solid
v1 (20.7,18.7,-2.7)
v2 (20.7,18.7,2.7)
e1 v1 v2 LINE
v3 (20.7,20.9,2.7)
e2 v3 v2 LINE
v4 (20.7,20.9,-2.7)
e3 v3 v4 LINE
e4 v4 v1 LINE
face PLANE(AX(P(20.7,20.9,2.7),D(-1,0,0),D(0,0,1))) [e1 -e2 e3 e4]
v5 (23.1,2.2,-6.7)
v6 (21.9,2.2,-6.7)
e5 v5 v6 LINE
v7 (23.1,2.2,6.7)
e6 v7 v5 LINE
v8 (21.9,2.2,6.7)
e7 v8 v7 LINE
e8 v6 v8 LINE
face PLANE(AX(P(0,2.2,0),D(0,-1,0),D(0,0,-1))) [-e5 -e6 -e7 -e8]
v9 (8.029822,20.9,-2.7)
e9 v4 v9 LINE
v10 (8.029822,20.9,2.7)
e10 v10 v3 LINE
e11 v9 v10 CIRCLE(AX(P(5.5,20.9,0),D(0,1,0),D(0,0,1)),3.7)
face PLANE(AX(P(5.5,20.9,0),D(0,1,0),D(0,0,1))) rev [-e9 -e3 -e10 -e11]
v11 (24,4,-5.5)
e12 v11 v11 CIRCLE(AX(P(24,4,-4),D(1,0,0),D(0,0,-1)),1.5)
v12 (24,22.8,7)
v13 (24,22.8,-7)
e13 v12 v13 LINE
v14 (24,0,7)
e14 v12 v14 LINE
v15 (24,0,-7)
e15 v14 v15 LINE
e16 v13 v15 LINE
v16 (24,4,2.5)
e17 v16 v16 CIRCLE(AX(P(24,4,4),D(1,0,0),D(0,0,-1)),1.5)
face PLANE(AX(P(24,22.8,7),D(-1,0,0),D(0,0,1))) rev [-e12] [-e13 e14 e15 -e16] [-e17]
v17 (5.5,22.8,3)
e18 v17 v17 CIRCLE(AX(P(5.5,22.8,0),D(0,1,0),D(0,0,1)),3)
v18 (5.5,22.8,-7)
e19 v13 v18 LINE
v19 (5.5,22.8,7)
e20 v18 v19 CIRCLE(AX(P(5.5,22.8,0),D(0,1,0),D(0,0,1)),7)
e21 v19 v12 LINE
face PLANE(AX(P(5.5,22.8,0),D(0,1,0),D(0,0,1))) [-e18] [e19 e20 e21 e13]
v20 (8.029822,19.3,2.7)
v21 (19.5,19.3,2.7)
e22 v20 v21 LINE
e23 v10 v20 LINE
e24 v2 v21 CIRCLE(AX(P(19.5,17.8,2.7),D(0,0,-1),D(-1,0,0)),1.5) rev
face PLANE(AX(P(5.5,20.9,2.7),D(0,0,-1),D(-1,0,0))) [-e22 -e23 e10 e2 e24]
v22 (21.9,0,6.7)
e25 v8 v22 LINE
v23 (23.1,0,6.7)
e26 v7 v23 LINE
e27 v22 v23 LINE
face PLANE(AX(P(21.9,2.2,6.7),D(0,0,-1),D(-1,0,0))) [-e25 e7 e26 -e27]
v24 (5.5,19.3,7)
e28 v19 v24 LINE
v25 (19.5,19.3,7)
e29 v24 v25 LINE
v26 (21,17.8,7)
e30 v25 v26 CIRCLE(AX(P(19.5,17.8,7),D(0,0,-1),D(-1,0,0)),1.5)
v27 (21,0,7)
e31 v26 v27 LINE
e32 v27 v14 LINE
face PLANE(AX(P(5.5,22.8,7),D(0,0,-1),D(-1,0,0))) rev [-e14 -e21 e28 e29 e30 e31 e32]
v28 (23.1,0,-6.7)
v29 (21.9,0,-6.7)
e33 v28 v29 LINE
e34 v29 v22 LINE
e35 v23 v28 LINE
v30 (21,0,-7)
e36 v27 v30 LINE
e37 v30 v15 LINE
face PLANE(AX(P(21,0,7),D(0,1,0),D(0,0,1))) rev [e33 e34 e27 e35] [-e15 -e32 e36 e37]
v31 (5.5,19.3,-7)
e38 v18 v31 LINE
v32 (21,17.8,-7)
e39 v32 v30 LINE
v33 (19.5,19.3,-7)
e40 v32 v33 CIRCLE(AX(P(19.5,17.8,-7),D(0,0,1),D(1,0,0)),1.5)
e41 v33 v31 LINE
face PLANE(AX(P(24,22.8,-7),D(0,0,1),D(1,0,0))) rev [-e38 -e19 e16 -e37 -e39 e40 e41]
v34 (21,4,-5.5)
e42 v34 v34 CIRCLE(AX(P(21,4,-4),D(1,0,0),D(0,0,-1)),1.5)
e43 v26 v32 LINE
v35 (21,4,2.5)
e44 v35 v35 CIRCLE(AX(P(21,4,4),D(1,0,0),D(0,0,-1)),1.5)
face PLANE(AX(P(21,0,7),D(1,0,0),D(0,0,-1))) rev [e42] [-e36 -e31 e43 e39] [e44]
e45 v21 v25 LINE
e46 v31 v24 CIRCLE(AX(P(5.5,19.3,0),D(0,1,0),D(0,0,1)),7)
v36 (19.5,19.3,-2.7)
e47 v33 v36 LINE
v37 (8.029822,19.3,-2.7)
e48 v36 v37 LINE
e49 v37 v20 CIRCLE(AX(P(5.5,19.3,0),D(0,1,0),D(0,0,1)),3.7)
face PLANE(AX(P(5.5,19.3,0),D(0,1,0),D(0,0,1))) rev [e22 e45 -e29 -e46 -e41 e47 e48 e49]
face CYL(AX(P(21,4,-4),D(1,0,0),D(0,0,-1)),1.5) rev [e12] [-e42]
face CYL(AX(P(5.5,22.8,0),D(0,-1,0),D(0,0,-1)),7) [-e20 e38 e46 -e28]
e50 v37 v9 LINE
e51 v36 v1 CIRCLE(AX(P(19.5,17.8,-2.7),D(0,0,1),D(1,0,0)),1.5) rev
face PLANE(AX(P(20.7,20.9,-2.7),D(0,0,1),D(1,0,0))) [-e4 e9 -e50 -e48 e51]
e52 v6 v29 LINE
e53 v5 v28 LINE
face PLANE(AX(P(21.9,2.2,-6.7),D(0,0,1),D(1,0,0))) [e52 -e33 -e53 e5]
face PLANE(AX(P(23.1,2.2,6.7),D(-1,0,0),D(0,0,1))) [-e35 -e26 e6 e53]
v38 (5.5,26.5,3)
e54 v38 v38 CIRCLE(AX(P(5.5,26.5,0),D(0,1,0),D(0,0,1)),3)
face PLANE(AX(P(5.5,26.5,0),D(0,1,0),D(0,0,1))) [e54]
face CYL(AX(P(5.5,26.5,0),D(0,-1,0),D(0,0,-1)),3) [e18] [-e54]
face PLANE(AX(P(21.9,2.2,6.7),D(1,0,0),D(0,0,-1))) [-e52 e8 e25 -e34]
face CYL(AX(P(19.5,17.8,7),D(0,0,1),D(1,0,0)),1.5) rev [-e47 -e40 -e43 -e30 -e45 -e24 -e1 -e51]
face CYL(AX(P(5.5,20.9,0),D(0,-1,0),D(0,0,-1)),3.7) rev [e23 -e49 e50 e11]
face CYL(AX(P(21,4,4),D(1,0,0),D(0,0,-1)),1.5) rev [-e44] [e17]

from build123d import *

# Parameters (mm, degrees)
BOSS_EXTRUDE1_DEPTH = 3.5
SKETCH2_W           = 3
SKETCH2_H           = 22.8
BOSS_EXTRUDE2_DEPTH = 7
SKETCH3_R           = 3
BOSS_EXTRUDE3_DEPTH = 3.7
SKETCH4_R           = 3.7
CUT_EXTRUDE2_DEPTH  = 1.6
CUT_EXTRUDE4_DEPTH  = 1.6
SKETCH6_W           = 1.2
SKETCH6_H           = 13.4
CUT_EXTRUDE6_DEPTH  = 2.2
SKETCH7_R           = 1.5
CUT_EXTRUDE7_DEPTH  = 3
FILLET1_R           = 1.5


with BuildPart() as part:
    # Sketch1 → Boss-Extrude1 (new body)
    with BuildSketch(Plane(origin=(0, 19.3, 0), x_dir=(1, 0, 0), z_dir=(0, 1, 0))):
        with BuildLine():
            Line((5.5, -7), (24, -7))
            Line((24, -7), (24, 7))
            Line((24, 7), (5.5, 7))
            ThreePointArc((5.5, 7), (-1.5, 0), (5.5, -7))
        make_face()
    extrude(amount=BOSS_EXTRUDE1_DEPTH)

    # Sketch2 → Boss-Extrude2 (add, symmetric)
    with BuildSketch(Plane.XY):
        with Locations((22.5, 11.4)):
            Rectangle(SKETCH2_W, SKETCH2_H)
    extrude(amount=BOSS_EXTRUDE2_DEPTH, both=True)

    # Sketch3 → Boss-Extrude3 (add)
    with BuildSketch(Plane(origin=(0, 22.8, 0), x_dir=(1, 0, 0), z_dir=(0, 1, 0))):
        with Locations(Location((5.5, 0, 0), (0, 0, 270))):
            Circle(SKETCH3_R)
    extrude(amount=BOSS_EXTRUDE3_DEPTH)

    # Sketch4 → Cut-Extrude2 (cut)
    with BuildSketch(Plane(origin=(0, 19.3, 0), x_dir=(1, 0, 0), z_dir=(0, 1, 0))):
        with Locations(Location((5.5, 0, 0), (0, 0, 270))):
            Circle(SKETCH4_R)
    extrude(amount=CUT_EXTRUDE2_DEPTH, mode=Mode.SUBTRACT)

    # Sketch5 → Cut-Extrude4 (cut)
    with BuildSketch(Plane(origin=(0, 19.3, 0), x_dir=(1, 0, 0), z_dir=(0, 1, 0))):
        with BuildLine():
            Line((5.5, -2.7), (20.7, -2.7))
            Line((20.7, -2.7), (20.7, 2.7))
            Line((20.7, 2.7), (5.5, 2.7))
            ThreePointArc((5.5, 2.7), (2.8, 0), (5.5, -2.7))
        make_face()
    extrude(amount=CUT_EXTRUDE4_DEPTH, mode=Mode.SUBTRACT)

    # Sketch6 → Cut-Extrude6 (cut)
    with BuildSketch(Plane(origin=(0, 0, 0), x_dir=(1, 0, 0), z_dir=(0, 1, 0))):
        with Locations((22.5, 0)):
            Rectangle(SKETCH6_W, SKETCH6_H)
    extrude(amount=CUT_EXTRUDE6_DEPTH, mode=Mode.SUBTRACT)

    # Sketch7 → Cut-Extrude7 (cut)
    with BuildSketch(Plane(origin=(24, 0, 0), x_dir=(0, 0, -1), z_dir=(1, 0, 0))):
        with Locations((-4, 4)):
            Circle(SKETCH7_R)
        with Locations((4, 4)):
            Circle(SKETCH7_R)
    extrude(amount=-CUT_EXTRUDE7_DEPTH, mode=Mode.SUBTRACT)

    # Fillet1
    # the kernel refuses this fillet: 1.5 mm, written as the material it adds along each edge
    with BuildSketch(Plane(origin=(21, 19.3, -7), x_dir=(-1, 0, 0), z_dir=(0, 0, 1))) as fillet1_piece_1_section:
        with BuildLine():
            CenterArc((FILLET1_R, FILLET1_R), FILLET1_R, 180, 90)
            Line((0, FILLET1_R), (0, 0))
            Line((0, 0), (FILLET1_R, 0))
        make_face()
    fillet1_piece_1 = extrude(amount=14, mode=Mode.PRIVATE)
    fillet1_piece_1 = split(fillet1_piece_1, bisect_by=Plane(origin=(20.368695353, 19.155022342, -2.7), z_dir=(0, 0, -1)), keep=Keep.TOP, mode=Mode.PRIVATE)
    fillet1_piece_1 = split(fillet1_piece_1, bisect_by=Plane(origin=(20.7, 19.155022342, -4.85), z_dir=(-1, 0, 0)), keep=Keep.TOP, mode=Mode.PRIVATE)
    add(fillet1_piece_1)
    with BuildSketch(Plane(origin=(21, 19.3, -7), x_dir=(-1, 0, 0), z_dir=(0, 0, 1))) as fillet1_piece_2_section:
        with BuildLine():
            CenterArc((FILLET1_R, FILLET1_R), FILLET1_R, 180, 90)
            Line((0, FILLET1_R), (0, 0))
            Line((0, 0), (FILLET1_R, 0))
        make_face()
    fillet1_piece_2 = extrude(amount=14, mode=Mode.PRIVATE)
    fillet1_piece_2 = split(fillet1_piece_2, bisect_by=Plane(origin=(20.890163131, 18.807126241, -2.7), z_dir=(0, 0, -1)), keep=Keep.TOP, mode=Mode.PRIVATE)
    fillet1_piece_2 = split(fillet1_piece_2, bisect_by=Plane(origin=(20.7, 18.807126241, -4.85), z_dir=(1, 0, 0)), keep=Keep.TOP, mode=Mode.PRIVATE)
    add(fillet1_piece_2)
    with BuildSketch(Plane(origin=(21, 19.3, -7), x_dir=(-1, 0, 0), z_dir=(0, 0, 1))) as fillet1_piece_3_section:
        with BuildLine():
            CenterArc((FILLET1_R, FILLET1_R), FILLET1_R, 180, 90)
            Line((0, FILLET1_R), (0, 0))
            Line((0, 0), (FILLET1_R, 0))
        make_face()
    fillet1_piece_3 = extrude(amount=14, mode=Mode.PRIVATE)
    fillet1_piece_3 = split(fillet1_piece_3, bisect_by=Plane(origin=(20.890163131, 18.807126241, 2.7), z_dir=(0, 0, -1)), keep=Keep.TOP, mode=Mode.PRIVATE)
    fillet1_piece_3 = split(fillet1_piece_3, bisect_by=Plane(origin=(20.890163131, 18.807126241, -2.7), z_dir=(0, 0, 1)), keep=Keep.TOP, mode=Mode.PRIVATE)
    fillet1_piece_3 = split(fillet1_piece_3, bisect_by=Plane(origin=(20.7, 18.807126241, 0), z_dir=(1, 0, 0)), keep=Keep.TOP, mode=Mode.PRIVATE)
    add(fillet1_piece_3)
    with BuildSketch(Plane(origin=(21, 19.3, -7), x_dir=(-1, 0, 0), z_dir=(0, 0, 1))) as fillet1_piece_4_section:
        with BuildLine():
            CenterArc((FILLET1_R, FILLET1_R), FILLET1_R, 180, 90)
            Line((0, FILLET1_R), (0, 0))
            Line((0, 0), (FILLET1_R, 0))
        make_face()
    fillet1_piece_4 = extrude(amount=14, mode=Mode.PRIVATE)
    fillet1_piece_4 = split(fillet1_piece_4, bisect_by=Plane(origin=(20.368695353, 19.155022342, 2.7), z_dir=(0, 0, 1)), keep=Keep.TOP, mode=Mode.PRIVATE)
    fillet1_piece_4 = split(fillet1_piece_4, bisect_by=Plane(origin=(20.7, 19.155022342, 4.85), z_dir=(-1, 0, 0)), keep=Keep.TOP, mode=Mode.PRIVATE)
    add(fillet1_piece_4)
    with BuildSketch(Plane(origin=(21, 19.3, -7), x_dir=(-1, 0, 0), z_dir=(0, 0, 1))) as fillet1_piece_5_section:
        with BuildLine():
            CenterArc((FILLET1_R, FILLET1_R), FILLET1_R, 180, 90)
            Line((0, FILLET1_R), (0, 0))
            Line((0, 0), (FILLET1_R, 0))
        make_face()
    fillet1_piece_5 = extrude(amount=14, mode=Mode.PRIVATE)
    fillet1_piece_5 = split(fillet1_piece_5, bisect_by=Plane(origin=(20.890163131, 18.807126241, 2.7), z_dir=(0, 0, 1)), keep=Keep.TOP, mode=Mode.PRIVATE)
    fillet1_piece_5 = split(fillet1_piece_5, bisect_by=Plane(origin=(20.7, 18.807126241, 4.85), z_dir=(1, 0, 0)), keep=Keep.TOP, mode=Mode.PRIVATE)
    add(fillet1_piece_5)


solid = part.part
